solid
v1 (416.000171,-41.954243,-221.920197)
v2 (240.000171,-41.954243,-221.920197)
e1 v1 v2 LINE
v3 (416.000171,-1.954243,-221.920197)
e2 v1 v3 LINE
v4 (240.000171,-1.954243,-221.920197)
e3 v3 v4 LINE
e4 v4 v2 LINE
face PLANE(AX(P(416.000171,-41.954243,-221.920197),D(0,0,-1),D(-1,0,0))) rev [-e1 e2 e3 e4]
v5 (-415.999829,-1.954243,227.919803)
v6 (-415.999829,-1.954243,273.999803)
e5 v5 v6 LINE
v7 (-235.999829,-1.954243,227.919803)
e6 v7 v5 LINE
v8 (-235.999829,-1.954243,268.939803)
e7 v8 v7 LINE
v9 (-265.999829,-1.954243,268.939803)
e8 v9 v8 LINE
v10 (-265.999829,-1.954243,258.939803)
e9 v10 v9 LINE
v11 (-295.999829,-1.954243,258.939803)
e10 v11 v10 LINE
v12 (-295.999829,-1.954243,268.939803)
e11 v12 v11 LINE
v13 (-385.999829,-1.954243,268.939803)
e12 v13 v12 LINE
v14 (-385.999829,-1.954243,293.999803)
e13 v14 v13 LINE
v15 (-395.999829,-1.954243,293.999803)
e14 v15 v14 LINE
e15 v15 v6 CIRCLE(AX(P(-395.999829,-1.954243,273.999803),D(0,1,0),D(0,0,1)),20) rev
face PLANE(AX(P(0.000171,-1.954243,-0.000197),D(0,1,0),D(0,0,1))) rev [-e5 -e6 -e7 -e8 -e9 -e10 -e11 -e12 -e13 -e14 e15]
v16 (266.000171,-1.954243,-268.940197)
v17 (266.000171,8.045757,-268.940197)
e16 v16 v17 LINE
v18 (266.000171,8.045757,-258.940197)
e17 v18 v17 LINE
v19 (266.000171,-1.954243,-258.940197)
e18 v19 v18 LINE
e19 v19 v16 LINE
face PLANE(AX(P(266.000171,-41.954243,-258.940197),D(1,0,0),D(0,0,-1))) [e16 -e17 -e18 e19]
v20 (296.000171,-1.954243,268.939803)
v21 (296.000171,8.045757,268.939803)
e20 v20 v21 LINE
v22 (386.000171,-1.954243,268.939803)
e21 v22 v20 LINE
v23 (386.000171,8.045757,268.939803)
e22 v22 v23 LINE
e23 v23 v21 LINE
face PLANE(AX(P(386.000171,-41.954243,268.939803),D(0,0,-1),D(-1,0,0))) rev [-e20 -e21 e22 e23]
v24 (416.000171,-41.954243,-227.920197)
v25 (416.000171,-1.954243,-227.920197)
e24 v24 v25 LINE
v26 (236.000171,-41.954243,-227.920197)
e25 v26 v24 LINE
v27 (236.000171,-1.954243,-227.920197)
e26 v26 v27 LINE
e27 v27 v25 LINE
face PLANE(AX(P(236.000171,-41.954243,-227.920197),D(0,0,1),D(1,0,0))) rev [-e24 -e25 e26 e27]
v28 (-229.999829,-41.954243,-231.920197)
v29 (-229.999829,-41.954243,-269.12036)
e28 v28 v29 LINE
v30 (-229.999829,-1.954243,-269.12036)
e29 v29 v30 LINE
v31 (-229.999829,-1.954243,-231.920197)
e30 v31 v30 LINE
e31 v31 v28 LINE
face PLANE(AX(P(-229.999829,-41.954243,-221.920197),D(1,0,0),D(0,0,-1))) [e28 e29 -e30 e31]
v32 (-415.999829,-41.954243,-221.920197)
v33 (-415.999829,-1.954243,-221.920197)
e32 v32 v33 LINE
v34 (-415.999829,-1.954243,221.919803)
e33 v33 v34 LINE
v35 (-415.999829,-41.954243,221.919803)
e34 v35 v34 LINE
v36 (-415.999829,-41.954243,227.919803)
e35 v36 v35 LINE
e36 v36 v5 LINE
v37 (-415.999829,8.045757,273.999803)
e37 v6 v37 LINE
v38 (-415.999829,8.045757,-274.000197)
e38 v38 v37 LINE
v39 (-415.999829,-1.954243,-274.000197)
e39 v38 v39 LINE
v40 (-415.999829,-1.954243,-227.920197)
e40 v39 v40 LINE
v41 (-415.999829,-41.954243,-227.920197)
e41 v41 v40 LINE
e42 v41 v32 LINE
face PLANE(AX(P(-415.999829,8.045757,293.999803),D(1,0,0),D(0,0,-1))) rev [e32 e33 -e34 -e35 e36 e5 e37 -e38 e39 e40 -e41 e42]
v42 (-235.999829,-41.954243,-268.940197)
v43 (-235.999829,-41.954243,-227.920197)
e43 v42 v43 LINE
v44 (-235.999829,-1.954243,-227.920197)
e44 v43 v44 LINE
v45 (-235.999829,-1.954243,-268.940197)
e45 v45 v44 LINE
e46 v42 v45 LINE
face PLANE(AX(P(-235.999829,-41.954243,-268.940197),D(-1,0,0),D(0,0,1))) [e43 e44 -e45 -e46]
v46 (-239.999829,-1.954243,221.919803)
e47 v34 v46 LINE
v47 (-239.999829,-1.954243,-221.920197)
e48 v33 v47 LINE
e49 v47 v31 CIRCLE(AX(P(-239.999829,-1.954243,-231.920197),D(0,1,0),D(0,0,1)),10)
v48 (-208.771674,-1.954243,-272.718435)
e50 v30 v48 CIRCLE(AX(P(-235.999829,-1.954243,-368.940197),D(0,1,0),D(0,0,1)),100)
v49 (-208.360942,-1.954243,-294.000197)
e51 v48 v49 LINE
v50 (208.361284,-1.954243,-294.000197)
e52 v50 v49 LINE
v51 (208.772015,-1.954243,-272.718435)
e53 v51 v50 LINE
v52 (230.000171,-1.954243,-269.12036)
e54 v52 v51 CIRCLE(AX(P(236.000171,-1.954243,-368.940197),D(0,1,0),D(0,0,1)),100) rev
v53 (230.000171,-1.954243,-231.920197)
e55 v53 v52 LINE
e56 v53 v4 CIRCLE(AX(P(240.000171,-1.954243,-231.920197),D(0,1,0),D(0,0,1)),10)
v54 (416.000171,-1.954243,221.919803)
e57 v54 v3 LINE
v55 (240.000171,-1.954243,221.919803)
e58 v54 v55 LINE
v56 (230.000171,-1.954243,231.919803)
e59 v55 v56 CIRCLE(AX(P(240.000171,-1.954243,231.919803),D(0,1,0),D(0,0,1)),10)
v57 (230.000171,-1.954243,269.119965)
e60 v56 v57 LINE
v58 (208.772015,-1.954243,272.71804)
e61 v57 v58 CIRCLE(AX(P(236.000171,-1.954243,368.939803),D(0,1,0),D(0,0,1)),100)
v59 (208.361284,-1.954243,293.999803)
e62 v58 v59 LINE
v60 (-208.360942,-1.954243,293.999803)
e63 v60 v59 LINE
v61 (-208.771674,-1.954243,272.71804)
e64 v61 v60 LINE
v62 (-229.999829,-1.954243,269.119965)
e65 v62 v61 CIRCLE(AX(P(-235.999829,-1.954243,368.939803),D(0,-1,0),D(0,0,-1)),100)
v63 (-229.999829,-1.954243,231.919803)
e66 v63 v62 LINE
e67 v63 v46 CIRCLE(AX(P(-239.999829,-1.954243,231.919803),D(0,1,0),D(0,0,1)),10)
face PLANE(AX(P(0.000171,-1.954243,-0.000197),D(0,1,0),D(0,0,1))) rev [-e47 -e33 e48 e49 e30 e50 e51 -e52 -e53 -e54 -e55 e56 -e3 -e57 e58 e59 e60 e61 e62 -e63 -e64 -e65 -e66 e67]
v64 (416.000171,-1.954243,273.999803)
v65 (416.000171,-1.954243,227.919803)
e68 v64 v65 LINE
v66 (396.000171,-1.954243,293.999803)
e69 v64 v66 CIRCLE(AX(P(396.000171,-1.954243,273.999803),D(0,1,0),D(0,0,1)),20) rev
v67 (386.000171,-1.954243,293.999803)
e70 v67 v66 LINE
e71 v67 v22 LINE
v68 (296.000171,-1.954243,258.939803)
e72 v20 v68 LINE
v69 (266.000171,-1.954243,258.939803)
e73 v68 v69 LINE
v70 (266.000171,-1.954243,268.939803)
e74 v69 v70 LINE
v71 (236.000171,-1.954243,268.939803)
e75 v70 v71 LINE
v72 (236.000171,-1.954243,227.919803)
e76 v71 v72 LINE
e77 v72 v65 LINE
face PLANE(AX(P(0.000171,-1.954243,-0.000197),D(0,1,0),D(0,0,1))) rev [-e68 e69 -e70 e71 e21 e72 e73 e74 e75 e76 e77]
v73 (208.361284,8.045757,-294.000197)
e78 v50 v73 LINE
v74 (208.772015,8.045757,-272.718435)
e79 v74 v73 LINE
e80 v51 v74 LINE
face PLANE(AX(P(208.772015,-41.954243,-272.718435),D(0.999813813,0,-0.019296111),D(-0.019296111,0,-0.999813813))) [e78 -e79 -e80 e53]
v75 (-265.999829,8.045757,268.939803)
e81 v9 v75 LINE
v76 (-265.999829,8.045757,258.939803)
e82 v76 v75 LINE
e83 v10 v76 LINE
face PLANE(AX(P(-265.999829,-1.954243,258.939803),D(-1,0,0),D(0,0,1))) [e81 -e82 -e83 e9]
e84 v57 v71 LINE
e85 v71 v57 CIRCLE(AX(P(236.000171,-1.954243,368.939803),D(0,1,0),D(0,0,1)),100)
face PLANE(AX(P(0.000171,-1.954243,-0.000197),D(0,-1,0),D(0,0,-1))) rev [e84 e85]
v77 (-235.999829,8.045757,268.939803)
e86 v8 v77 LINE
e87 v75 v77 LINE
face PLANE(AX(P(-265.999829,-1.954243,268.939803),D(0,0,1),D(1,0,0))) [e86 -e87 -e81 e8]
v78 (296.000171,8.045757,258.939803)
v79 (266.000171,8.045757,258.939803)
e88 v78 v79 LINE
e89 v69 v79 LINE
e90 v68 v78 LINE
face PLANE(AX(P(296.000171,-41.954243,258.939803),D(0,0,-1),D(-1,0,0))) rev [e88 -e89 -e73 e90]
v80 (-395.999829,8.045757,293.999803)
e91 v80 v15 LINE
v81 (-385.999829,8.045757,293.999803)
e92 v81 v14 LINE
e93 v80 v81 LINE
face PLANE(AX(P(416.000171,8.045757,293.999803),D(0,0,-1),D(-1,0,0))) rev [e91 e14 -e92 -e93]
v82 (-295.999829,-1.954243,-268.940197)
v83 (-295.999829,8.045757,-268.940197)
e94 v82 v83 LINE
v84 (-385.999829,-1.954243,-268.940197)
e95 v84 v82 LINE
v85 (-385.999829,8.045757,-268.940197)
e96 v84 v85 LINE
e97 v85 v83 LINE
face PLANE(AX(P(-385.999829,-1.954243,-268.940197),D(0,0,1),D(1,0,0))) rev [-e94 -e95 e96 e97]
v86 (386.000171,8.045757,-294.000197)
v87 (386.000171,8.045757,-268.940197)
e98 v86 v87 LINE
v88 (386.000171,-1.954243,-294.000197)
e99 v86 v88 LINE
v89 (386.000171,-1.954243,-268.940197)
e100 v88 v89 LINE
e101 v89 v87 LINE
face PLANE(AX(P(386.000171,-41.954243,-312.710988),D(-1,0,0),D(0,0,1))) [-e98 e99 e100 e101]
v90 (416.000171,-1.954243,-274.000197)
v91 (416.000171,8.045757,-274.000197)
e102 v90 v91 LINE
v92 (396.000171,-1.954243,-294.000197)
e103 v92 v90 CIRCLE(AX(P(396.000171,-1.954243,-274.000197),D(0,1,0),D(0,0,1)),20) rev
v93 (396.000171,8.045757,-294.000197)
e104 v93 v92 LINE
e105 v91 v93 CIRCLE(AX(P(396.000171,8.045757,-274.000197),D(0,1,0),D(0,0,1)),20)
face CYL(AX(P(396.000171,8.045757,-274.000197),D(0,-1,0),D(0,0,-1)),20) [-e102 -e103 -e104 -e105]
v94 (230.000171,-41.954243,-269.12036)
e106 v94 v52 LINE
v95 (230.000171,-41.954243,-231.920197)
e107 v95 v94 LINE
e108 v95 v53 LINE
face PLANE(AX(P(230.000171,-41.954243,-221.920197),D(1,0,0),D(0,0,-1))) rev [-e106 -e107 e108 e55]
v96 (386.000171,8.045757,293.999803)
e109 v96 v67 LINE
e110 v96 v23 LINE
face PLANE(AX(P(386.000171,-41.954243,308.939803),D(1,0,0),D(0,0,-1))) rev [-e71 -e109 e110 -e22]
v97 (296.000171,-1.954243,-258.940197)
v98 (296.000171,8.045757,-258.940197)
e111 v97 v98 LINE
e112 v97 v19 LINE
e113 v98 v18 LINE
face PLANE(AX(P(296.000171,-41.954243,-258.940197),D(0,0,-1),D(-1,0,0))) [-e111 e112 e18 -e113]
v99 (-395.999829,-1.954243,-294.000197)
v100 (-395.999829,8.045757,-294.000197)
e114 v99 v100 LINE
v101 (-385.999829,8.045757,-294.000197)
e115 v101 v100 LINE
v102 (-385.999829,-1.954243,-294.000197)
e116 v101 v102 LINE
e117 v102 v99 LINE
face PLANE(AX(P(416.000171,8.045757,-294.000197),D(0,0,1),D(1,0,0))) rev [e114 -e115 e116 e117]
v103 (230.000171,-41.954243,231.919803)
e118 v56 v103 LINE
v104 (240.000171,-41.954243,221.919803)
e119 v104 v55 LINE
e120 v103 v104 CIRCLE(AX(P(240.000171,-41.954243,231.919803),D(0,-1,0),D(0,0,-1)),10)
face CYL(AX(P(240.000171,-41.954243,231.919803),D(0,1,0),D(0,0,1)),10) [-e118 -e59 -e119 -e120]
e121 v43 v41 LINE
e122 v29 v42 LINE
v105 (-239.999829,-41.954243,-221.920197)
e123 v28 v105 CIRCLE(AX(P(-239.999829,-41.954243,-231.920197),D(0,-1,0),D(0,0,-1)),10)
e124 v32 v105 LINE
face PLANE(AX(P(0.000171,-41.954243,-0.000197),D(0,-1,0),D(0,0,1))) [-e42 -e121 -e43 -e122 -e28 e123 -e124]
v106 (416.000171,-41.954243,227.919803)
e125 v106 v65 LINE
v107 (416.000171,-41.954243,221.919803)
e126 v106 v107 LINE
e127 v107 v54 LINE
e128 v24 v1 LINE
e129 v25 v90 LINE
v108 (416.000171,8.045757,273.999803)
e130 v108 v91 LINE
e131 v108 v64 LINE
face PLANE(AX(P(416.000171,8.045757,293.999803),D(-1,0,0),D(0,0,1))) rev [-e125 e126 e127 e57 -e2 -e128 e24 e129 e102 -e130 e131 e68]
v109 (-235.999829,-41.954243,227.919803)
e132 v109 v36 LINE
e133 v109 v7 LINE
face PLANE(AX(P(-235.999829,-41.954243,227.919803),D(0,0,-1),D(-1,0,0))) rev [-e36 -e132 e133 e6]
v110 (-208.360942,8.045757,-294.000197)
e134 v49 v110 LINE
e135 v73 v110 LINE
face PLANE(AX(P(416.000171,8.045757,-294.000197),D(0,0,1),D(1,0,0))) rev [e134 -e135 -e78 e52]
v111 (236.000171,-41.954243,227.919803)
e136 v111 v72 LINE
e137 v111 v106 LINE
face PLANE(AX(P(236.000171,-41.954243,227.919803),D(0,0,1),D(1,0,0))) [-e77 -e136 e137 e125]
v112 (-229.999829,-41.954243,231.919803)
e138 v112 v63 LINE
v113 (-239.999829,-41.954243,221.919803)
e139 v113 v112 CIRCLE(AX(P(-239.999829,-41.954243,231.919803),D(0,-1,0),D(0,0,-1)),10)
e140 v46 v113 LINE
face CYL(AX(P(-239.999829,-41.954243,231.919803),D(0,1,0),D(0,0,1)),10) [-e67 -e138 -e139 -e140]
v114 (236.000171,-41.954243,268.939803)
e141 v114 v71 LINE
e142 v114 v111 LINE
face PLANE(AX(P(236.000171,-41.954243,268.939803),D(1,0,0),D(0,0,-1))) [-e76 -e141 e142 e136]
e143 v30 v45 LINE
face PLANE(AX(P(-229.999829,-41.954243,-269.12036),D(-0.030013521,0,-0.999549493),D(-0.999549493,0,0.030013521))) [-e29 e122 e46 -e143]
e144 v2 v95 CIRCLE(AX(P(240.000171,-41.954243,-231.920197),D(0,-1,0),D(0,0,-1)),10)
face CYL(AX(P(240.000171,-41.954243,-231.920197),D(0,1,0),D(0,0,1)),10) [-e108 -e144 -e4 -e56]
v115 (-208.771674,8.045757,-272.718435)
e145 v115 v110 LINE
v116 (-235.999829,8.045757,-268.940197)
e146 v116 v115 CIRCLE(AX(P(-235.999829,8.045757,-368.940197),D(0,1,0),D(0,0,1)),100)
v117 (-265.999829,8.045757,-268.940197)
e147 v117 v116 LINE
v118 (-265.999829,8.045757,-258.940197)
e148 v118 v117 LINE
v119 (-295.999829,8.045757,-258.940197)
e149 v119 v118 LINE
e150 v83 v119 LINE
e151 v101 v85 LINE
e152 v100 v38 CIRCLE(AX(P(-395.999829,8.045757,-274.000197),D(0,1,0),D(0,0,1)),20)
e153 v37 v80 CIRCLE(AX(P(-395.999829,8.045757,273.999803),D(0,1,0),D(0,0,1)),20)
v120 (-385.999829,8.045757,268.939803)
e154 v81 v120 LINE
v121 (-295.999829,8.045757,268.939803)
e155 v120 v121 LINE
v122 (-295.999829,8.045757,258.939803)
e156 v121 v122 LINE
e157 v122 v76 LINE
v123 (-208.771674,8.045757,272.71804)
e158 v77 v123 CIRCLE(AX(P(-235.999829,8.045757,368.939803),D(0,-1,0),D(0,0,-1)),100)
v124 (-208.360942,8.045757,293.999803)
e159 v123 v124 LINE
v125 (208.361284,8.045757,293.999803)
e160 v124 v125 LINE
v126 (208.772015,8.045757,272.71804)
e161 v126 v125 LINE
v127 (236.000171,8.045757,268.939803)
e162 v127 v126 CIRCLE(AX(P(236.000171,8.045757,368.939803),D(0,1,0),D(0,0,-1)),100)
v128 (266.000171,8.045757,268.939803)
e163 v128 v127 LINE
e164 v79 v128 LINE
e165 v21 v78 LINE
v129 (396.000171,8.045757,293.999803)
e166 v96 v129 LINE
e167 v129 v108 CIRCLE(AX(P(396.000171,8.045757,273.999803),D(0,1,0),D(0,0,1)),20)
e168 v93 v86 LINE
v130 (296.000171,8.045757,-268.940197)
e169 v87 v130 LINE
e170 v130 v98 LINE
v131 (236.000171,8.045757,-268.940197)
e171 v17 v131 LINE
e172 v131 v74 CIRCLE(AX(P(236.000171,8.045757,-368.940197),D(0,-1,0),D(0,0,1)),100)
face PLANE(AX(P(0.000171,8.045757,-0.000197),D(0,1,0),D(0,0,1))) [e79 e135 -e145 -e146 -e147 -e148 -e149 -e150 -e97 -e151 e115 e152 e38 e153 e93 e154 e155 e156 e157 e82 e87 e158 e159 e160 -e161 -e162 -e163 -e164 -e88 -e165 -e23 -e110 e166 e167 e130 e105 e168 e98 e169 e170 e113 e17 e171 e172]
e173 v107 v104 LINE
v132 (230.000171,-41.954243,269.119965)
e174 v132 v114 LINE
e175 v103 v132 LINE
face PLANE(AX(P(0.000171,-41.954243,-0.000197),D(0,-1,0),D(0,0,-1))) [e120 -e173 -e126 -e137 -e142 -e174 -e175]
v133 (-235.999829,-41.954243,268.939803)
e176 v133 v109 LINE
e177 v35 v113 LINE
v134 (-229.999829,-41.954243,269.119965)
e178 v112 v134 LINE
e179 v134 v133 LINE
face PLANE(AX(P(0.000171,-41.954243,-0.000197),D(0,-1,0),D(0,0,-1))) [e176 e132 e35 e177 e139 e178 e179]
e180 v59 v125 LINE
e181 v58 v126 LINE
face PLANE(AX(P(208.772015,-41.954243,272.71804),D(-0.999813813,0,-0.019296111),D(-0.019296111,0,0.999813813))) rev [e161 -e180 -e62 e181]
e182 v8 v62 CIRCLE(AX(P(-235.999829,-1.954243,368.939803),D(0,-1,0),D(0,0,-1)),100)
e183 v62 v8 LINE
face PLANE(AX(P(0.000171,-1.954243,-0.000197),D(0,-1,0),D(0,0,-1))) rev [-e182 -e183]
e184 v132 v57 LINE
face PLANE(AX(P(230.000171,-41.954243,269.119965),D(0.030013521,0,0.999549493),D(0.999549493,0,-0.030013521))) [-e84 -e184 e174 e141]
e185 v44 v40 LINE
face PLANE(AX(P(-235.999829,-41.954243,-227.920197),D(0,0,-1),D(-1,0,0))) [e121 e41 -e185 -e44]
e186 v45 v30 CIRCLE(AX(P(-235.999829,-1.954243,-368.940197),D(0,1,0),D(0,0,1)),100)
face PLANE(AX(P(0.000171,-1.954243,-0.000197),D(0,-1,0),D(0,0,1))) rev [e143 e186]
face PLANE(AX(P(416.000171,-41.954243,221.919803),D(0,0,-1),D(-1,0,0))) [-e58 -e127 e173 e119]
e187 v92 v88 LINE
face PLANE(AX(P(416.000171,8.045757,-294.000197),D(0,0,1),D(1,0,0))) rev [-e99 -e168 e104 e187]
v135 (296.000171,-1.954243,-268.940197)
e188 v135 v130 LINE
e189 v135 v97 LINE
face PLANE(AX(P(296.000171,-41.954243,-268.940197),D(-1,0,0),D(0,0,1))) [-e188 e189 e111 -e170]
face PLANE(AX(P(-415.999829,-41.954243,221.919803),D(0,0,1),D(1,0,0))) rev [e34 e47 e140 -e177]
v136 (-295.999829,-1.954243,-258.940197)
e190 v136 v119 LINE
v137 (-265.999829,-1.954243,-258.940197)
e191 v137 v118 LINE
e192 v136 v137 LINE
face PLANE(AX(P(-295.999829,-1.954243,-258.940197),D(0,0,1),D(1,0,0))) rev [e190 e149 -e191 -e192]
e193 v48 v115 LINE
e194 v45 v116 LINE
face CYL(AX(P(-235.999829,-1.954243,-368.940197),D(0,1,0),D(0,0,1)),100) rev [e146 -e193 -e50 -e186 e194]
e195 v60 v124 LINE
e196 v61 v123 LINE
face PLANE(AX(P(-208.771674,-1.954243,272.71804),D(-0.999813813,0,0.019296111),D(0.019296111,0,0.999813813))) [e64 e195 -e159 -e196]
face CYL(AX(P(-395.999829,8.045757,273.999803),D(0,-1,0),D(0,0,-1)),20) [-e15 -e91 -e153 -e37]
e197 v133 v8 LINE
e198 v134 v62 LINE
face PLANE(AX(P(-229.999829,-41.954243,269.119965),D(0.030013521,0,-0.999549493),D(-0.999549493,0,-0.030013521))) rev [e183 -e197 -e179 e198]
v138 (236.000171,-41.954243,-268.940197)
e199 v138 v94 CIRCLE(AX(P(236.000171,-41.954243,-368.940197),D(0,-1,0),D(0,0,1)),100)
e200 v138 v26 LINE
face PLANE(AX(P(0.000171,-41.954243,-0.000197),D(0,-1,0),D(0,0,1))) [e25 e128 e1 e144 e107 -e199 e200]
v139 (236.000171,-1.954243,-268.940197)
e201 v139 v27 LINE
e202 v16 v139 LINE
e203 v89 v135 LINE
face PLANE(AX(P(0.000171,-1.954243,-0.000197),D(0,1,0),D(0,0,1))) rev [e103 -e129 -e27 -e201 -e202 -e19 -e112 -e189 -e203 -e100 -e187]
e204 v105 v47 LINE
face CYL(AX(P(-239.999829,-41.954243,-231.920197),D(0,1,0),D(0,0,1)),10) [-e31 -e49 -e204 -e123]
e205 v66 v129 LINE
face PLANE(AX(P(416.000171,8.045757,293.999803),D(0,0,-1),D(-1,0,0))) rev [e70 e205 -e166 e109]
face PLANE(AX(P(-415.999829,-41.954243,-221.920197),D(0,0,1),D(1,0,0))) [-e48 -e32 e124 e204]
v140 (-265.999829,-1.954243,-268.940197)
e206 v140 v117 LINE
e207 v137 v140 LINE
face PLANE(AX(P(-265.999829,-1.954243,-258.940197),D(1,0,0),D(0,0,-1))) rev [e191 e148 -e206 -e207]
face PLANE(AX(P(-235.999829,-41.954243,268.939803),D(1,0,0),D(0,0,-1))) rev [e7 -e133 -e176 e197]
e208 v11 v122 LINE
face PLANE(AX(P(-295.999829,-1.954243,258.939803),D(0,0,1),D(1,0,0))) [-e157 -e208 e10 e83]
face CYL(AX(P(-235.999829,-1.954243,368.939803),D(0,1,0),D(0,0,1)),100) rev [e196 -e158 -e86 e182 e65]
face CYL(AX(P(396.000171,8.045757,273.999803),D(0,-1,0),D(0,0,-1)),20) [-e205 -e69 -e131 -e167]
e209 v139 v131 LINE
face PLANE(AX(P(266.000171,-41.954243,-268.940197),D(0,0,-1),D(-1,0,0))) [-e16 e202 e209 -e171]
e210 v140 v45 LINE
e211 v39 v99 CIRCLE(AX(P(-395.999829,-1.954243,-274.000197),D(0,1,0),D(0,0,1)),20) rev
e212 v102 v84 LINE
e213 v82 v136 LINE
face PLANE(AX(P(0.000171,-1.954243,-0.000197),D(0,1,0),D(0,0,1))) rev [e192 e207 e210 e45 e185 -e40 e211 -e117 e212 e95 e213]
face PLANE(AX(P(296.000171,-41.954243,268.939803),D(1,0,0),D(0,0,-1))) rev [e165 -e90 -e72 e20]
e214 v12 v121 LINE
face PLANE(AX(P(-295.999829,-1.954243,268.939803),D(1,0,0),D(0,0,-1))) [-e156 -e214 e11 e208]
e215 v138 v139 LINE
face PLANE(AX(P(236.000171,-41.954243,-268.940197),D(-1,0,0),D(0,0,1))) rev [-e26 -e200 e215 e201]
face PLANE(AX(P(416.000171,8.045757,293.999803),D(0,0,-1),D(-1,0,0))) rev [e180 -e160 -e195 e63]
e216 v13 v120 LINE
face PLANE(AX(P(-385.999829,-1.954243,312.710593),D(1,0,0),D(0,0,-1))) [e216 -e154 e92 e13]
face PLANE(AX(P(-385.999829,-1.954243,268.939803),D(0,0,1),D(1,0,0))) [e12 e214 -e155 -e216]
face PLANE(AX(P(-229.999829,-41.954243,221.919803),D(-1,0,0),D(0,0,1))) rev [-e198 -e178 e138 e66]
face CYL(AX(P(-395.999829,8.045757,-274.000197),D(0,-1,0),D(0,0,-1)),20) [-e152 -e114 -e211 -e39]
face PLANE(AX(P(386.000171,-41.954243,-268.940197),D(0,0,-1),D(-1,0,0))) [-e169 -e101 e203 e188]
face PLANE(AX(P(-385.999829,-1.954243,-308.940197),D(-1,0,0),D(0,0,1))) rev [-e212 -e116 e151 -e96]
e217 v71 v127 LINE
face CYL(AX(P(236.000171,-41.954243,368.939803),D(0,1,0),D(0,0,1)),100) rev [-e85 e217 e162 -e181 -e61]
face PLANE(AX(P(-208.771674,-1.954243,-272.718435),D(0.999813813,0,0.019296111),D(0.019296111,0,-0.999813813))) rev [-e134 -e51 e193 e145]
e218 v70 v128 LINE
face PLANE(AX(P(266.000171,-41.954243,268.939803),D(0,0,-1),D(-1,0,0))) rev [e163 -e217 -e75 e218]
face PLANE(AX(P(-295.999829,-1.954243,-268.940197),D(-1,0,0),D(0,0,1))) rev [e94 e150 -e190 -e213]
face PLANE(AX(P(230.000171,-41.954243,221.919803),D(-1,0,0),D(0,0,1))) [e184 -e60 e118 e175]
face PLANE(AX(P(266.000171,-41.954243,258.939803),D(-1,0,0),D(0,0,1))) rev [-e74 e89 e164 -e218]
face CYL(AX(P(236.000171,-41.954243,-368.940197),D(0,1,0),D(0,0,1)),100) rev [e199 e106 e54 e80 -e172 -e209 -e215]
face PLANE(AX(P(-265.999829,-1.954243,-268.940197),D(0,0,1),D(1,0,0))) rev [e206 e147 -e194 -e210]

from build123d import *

# Parameters (mm, degrees)
CROQUIS1_W               = 416
CROQUIS1_H               = 294
SALIENTE_EXTRUIR1_DEPTH  = 5
CORTAR_EXTRUIR1_DEPTH    = 255.750858684
REDONDEO1_R              = 10
SALIENTE_EXTRUIR3_DEPTH  = 20
REDONDEO2_R              = 5
REDONDEO2_OF_SIMETR_A3_R = 5
SIMETR_A4_DEPTH          = 5
SIMETR_A4_START          = -20
SIMETR_A4_2_DEPTH        = 20
ESCALA1_SCALE            = 2


# Read off the part's stored shape, not the designer's step: Simetría4
with BuildPart() as part:
    # Croquis1 → Saliente-Extruir1 (new body)
    with BuildSketch(Plane(origin=(0, 0, 0), x_dir=(1, 0, 0), z_dir=(0, 1, 0))):
        Rectangle(CROQUIS1_W, CROQUIS1_H)
    extrude(amount=SALIENTE_EXTRUIR1_DEPTH)

    # Croquis3 → Cortar-Extruir1 (cut, through all)
    with BuildSketch(Plane(origin=(0, 5, 0), x_dir=(1, 0, 0), z_dir=(0, 1, 0))):
        with BuildLine():
            Line((-193, 154.47), (-193, 134.47))
            Line((-193, 134.47), (-148, 134.47))
            Line((-148, 134.47), (-148, 129.47))
            Line((-148, 129.47), (-133, 129.47))
            Line((-133, 129.47), (-133, 134.47))
            Line((-133, 134.47), (-118, 134.47))
            ThreePointArc((-118, 134.47), (-111.127739024, 134.944531511), (-104.385922224, 136.359118837))
            Line((-104.385922224, 136.359118837), (-104, 156.355395091))
            Line((-104, 156.355395091), (-193, 156.355395091))
            Line((-193, 156.355395091), (-193, 154.47))
        make_face()
    cortar_extruir1 = extrude(amount=-CORTAR_EXTRUIR1_DEPTH, mode=Mode.SUBTRACT)

    # Simetría1: Cortar-Extruir1 across plane
    add(cortar_extruir1.mirror(Plane.XY), mode=Mode.SUBTRACT)

    # Redondeo1
    redondeo1_edges = [part.edges().sort_by_distance(p)[0] for p in [
        (-208, 2.5, -147),
        (208, 2.5, -147),
        (208, 2.5, 147),
        (-208, 2.5, 147),
    ]]
    fillet(redondeo1_edges, radius=REDONDEO1_R)

    # Croquis5 → Saliente-Extruir3 (add)
    with BuildSketch(Plane.XZ):
        Polygon((-208, 110.96), (-115, 110.96), (-115, 134.560081146), (-118, 134.47), (-118, 113.96), (-208, 113.96), align=None)
    saliente_extruir3 = extrude(amount=SALIENTE_EXTRUIR3_DEPTH)

    # Redondeo2
    redondeo2_edges = [part.edges().sort_by_distance(p)[0] for p in [
        (-115, -10, 110.96),
    ]]
    fillet(redondeo2_edges, radius=REDONDEO2_R)

    # Simetría3: Saliente-Extruir3 across plane
    add(saliente_extruir3.mirror(Plane.XY))

    # Redondeo2 of Simetría3
    redondeo2_of_simetr_a3_edges = [part.edges().sort_by_distance(p)[0] for p in [
        (-115, -10, -110.96),
    ]]
    fillet(redondeo2_of_simetr_a3_edges, radius=REDONDEO2_OF_SIMETR_A3_R)

    # Simetría4 outline → Simetría4 (cut)
    with BuildSketch(Plane(origin=(0, 0, 0), x_dir=(1, 0, 0), z_dir=(0, 1, 0))):
        with BuildLine():
            Line((148, 134.47), (193, 134.47))
            Line((193, 134.47), (193, 147))
            Line((193, 147), (104.180556361, 147))
            Line((104.180556361, 147), (104.385922224, 136.359118837))
            ThreePointArc((104.385922224, 136.359118837), (111.127739024, 134.944531511), (118, 134.47))
            Line((118, 134.47), (133, 134.47))
            Line((133, 134.47), (133, 129.47))
            Line((133, 129.47), (148, 129.47))
            Line((148, 129.47), (148, 134.47))
        make_face()
        with BuildLine():
            Line((133, -134.47), (118, -134.47))
            ThreePointArc((118, -134.47), (111.127739024, -134.944531511), (104.385922224, -136.359118837))
            Line((104.385922224, -136.359118837), (104.180556361, -147))
            Line((104.180556361, -147), (193, -147))
            Line((193, -147), (193, -134.47))
            Line((193, -134.47), (148, -134.47))
            Line((148, -134.47), (148, -129.47))
            Line((148, -129.47), (133, -129.47))
            Line((133, -129.47), (133, -134.47))
        make_face()
    extrude(amount=SIMETR_A4_DEPTH, mode=Mode.SUBTRACT)

    # Simetr_a4 2 outline → Simetr_a4 2 (add)
    with BuildSketch(Plane(origin=(0, 0, 0), x_dir=(1, 0, 0), z_dir=(0, 1, 0)).offset(SIMETR_A4_START)):
        with BuildLine():
            Line((208, -113.96), (208, -110.96))
            Line((208, -110.96), (120, -110.96))
            ThreePointArc((120, -110.96), (116.464466094, -112.424466094), (115, -115.96))
            Line((115, -115.96), (115, -134.560081146))
            Line((115, -134.560081146), (118, -134.47))
            Line((118, -134.47), (118, -113.96))
            Line((118, -113.96), (208, -113.96))
        make_face()
        with BuildLine():
            ThreePointArc((118, 134.47), (116.499323935, 134.492525361), (115, 134.560081146))
            Line((115, 134.560081146), (115, 115.96))
            ThreePointArc((115, 115.96), (116.464466094, 112.424466094), (120, 110.96))
            Line((120, 110.96), (208, 110.96))
            Line((208, 110.96), (208, 113.96))
            Line((208, 113.96), (118, 113.96))
            Line((118, 113.96), (118, 134.47))
        make_face()
    extrude(amount=SIMETR_A4_2_DEPTH)


with BuildPart() as part_1:
    # Escala1: scaled about (-0.000170943, 1.954243012, 0.000197364)
    add(part.part.scale(ESCALA1_SCALE).moved(Location((0.000170943, -1.954243012, -0.000197364))))


solid = part_1.part
